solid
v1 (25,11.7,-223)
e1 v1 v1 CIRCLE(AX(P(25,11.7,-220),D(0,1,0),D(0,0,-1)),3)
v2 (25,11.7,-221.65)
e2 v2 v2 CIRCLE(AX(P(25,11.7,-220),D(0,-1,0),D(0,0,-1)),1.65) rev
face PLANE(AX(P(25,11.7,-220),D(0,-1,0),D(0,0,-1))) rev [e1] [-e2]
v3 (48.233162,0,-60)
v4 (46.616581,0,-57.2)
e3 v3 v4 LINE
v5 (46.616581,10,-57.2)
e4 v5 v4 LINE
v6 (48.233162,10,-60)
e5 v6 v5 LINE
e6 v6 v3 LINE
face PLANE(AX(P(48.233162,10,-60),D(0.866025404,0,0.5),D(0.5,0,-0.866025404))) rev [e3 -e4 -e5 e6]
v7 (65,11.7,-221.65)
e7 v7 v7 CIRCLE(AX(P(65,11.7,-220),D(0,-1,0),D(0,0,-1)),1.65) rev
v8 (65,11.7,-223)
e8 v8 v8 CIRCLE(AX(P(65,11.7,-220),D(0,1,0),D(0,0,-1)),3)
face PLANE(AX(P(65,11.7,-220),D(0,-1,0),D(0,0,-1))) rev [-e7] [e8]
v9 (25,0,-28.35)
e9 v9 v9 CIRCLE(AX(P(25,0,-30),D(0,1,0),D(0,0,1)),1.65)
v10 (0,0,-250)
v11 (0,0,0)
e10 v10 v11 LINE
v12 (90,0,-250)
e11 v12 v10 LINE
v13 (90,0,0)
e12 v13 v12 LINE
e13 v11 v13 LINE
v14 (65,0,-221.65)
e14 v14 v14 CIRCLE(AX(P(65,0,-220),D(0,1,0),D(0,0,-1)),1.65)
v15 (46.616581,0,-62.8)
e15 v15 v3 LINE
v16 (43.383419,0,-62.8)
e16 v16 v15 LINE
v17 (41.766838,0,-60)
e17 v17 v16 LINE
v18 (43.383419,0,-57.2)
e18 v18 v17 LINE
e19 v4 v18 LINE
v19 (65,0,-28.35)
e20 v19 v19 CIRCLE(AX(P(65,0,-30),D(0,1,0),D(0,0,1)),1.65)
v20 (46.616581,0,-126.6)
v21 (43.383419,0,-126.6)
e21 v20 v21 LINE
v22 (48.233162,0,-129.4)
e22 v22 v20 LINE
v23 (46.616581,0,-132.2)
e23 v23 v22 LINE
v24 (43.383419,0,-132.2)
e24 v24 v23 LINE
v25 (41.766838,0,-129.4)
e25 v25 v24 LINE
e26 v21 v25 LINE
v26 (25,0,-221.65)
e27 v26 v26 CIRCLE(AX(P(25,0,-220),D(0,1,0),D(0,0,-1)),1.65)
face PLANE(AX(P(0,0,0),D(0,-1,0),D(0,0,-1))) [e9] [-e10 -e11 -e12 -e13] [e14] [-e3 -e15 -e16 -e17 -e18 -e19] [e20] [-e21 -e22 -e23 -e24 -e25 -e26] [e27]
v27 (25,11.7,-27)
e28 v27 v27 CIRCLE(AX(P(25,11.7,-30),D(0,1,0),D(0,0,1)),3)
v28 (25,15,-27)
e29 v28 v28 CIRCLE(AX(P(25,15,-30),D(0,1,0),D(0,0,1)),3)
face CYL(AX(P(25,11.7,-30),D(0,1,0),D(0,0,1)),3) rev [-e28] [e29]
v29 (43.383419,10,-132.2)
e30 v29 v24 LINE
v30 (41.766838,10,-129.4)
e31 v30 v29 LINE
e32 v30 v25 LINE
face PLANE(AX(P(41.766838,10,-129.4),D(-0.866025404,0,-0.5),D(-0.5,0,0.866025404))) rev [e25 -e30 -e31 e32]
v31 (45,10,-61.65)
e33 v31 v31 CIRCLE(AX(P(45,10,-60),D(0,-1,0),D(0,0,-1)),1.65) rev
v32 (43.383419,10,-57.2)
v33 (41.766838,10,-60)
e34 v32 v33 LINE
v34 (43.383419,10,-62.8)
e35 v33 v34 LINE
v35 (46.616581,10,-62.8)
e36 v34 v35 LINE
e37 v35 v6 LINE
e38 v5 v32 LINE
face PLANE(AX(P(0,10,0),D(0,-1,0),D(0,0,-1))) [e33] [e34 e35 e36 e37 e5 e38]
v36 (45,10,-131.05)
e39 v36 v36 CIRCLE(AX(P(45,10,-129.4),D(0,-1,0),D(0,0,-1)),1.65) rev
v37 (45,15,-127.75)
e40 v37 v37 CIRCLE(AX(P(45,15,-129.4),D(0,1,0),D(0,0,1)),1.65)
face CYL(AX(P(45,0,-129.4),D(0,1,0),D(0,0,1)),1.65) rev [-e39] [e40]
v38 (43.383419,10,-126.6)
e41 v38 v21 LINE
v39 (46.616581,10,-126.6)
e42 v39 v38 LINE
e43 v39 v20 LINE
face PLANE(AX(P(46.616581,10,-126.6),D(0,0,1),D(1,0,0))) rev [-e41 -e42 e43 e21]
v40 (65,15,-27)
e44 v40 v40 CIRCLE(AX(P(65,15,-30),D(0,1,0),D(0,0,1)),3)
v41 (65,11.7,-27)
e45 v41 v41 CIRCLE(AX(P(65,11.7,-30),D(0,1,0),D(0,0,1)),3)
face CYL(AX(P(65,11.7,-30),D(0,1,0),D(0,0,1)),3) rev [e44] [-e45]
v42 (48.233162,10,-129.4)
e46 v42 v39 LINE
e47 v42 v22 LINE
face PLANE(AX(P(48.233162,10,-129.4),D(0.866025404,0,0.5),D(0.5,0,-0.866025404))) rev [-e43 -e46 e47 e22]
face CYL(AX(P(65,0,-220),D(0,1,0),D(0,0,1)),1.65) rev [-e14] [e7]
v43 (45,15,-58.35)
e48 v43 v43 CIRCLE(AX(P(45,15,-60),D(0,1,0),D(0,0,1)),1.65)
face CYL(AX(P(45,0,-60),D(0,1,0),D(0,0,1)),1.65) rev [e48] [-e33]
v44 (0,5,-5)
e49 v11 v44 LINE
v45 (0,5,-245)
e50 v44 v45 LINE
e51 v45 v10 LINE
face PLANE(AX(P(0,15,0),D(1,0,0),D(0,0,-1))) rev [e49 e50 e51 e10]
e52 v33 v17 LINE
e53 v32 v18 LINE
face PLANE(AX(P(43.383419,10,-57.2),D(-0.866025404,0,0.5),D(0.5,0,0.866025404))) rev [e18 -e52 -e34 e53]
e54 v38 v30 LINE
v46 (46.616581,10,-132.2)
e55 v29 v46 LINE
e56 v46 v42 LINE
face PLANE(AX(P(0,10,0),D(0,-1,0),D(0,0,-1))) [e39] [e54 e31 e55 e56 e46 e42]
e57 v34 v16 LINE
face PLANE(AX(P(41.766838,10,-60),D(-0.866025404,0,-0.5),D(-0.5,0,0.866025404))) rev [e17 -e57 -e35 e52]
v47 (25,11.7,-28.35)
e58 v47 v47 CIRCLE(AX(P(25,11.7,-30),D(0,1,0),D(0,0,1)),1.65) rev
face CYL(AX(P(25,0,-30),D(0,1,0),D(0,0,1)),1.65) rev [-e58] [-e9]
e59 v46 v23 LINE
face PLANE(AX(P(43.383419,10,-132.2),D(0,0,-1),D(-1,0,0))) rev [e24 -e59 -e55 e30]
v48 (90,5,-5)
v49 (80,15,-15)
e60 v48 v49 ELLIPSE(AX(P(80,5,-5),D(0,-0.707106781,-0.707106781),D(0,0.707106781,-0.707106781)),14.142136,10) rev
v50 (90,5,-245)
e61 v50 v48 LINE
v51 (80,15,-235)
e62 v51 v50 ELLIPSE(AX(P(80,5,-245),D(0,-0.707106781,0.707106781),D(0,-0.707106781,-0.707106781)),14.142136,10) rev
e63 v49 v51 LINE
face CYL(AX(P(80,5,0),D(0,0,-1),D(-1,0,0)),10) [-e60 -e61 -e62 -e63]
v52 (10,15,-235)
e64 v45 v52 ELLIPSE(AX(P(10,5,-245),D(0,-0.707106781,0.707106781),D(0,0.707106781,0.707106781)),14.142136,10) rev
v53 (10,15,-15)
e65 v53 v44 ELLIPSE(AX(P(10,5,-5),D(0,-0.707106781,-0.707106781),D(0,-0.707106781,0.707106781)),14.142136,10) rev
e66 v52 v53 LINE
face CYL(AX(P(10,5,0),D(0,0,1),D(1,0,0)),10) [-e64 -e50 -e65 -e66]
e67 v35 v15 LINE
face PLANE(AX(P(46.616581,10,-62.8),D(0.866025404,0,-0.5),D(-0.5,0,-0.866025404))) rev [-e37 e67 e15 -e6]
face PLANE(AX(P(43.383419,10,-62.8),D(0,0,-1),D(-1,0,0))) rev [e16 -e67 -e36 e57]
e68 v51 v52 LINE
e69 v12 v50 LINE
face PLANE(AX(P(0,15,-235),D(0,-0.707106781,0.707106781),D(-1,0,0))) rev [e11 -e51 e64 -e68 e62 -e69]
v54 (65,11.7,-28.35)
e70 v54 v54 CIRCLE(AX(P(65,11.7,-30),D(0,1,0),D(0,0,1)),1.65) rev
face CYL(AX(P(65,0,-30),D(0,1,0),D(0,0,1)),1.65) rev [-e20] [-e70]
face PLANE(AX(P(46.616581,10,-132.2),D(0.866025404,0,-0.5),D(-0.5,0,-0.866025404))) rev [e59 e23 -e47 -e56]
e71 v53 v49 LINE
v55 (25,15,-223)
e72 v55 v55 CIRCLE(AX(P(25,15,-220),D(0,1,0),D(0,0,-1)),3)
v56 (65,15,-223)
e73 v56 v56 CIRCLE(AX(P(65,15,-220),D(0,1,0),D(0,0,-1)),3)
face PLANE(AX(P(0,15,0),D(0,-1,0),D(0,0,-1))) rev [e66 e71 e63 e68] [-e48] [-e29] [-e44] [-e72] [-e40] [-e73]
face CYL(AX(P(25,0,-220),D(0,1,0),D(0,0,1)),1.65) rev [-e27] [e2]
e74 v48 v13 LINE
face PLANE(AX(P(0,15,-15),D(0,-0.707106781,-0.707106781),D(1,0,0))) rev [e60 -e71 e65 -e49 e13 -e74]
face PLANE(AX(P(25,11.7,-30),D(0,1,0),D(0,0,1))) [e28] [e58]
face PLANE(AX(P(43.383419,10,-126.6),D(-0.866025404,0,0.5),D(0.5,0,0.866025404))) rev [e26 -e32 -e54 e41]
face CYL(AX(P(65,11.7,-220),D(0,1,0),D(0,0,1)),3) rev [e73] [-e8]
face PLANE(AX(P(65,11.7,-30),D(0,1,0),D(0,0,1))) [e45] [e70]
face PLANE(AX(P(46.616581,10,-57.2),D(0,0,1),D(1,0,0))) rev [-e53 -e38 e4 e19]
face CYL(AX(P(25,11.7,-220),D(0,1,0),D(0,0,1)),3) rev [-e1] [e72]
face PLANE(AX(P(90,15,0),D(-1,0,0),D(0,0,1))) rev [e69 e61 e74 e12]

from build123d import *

# Parameters (mm, degrees)
SKETCH1_W           = 90
SKETCH1_H           = 250
BOSS_EXTRUDE1_DEPTH = 15
CHAMFER1_SIZE       = 15
FILLET1_R           = 10
SKETCH2_R           = 1.65
CUT_EXTRUDE1_DEPTH  = 267.129667643
SKETCH3_R           = 3
CUT_EXTRUDE2_DEPTH  = 3.3
SKETCH4_R           = 1.65
CUT_EXTRUDE3_DEPTH  = 267.129667643
CUT_EXTRUDE5_DEPTH  = 10


with BuildPart() as part:
    # Sketch1 → Boss-Extrude1 (new body)
    with BuildSketch(Plane(origin=(0, 0, 0), x_dir=(1, 0, 0), z_dir=(0, 1, 0))):
        with Locations((45, 125)):
            Rectangle(SKETCH1_W, SKETCH1_H)
    extrude(amount=BOSS_EXTRUDE1_DEPTH)

    # Chamfer1
    chamfer1_edges = [part.edges().sort_by_distance(p)[0] for p in [
        (45, 15, 0),
        (45, 15, -250),
    ]]
    chamfer(chamfer1_edges, length=CHAMFER1_SIZE - 0.0001)  # a hair under: the kernel refuses the full size

    # Fillet1
    fillet1_edges = [part.edges().sort_by_distance(p)[0] for p in [
        (0, 15, -125),
        (90, 15, -125),
    ]]
    fillet(fillet1_edges, radius=FILLET1_R)

    # Sketch2 → Cut-Extrude1 (cut, through all)
    with BuildSketch(Plane(origin=(0, 15, 0), x_dir=(1, 0, 0), z_dir=(0, 1, 0))):
        with Locations(Location((25, 30, 0), (0, 0, 270))):
            Circle(SKETCH2_R)
        with Locations(Location((65, 30, 0), (0, 0, 270))):
            Circle(SKETCH2_R)
        with Locations(Location((65, 220, 0), (0, 0, 90))):
            Circle(SKETCH2_R)
        with Locations(Location((25, 220, 0), (0, 0, 90))):
            Circle(SKETCH2_R)
    extrude(amount=-CUT_EXTRUDE1_DEPTH, mode=Mode.SUBTRACT)

    # Sketch3 → Cut-Extrude2 (cut)
    with BuildSketch(Plane(origin=(0, 15, 0), x_dir=(1, 0, 0), z_dir=(0, 1, 0))):
        with Locations(Location((25, 30, 0), (0, 0, 270))):
            Circle(SKETCH3_R)
        with Locations(Location((65, 30, 0), (0, 0, 270))):
            Circle(SKETCH3_R)
        with Locations(Location((65, 220, 0), (0, 0, 90))):
            Circle(SKETCH3_R)
        with Locations(Location((25, 220, 0), (0, 0, 90))):
            Circle(SKETCH3_R)
    extrude(amount=-CUT_EXTRUDE2_DEPTH, mode=Mode.SUBTRACT)

    # Sketch4 → Cut-Extrude3 (cut, through all)
    with BuildSketch(Plane(origin=(0, 15, 0), x_dir=(1, 0, 0), z_dir=(0, 1, 0))):
        with Locations(Location((45, 60, 0), (0, 0, 270))):
            Circle(SKETCH4_R)
        with Locations(Location((45, 129.4, 0), (0, 0, 270))):
            Circle(SKETCH4_R)
    extrude(amount=-CUT_EXTRUDE3_DEPTH, mode=Mode.SUBTRACT)

    # Sketch5 → Cut-Extrude5 (cut)
    with BuildSketch(Plane.XZ):
        Polygon((48.233161507, -60), (46.616580754, -57.2), (43.383419246, -57.2), (41.766838493, -60), (43.383419246, -62.8), (46.616580754, -62.8), align=None)
        Polygon((48.233161507, -129.4), (46.616580754, -126.6), (43.383419246, -126.6), (41.766838493, -129.4), (43.383419246, -132.2), (46.616580754, -132.2), align=None)
    extrude(amount=-CUT_EXTRUDE5_DEPTH, mode=Mode.SUBTRACT)


solid = part.part
